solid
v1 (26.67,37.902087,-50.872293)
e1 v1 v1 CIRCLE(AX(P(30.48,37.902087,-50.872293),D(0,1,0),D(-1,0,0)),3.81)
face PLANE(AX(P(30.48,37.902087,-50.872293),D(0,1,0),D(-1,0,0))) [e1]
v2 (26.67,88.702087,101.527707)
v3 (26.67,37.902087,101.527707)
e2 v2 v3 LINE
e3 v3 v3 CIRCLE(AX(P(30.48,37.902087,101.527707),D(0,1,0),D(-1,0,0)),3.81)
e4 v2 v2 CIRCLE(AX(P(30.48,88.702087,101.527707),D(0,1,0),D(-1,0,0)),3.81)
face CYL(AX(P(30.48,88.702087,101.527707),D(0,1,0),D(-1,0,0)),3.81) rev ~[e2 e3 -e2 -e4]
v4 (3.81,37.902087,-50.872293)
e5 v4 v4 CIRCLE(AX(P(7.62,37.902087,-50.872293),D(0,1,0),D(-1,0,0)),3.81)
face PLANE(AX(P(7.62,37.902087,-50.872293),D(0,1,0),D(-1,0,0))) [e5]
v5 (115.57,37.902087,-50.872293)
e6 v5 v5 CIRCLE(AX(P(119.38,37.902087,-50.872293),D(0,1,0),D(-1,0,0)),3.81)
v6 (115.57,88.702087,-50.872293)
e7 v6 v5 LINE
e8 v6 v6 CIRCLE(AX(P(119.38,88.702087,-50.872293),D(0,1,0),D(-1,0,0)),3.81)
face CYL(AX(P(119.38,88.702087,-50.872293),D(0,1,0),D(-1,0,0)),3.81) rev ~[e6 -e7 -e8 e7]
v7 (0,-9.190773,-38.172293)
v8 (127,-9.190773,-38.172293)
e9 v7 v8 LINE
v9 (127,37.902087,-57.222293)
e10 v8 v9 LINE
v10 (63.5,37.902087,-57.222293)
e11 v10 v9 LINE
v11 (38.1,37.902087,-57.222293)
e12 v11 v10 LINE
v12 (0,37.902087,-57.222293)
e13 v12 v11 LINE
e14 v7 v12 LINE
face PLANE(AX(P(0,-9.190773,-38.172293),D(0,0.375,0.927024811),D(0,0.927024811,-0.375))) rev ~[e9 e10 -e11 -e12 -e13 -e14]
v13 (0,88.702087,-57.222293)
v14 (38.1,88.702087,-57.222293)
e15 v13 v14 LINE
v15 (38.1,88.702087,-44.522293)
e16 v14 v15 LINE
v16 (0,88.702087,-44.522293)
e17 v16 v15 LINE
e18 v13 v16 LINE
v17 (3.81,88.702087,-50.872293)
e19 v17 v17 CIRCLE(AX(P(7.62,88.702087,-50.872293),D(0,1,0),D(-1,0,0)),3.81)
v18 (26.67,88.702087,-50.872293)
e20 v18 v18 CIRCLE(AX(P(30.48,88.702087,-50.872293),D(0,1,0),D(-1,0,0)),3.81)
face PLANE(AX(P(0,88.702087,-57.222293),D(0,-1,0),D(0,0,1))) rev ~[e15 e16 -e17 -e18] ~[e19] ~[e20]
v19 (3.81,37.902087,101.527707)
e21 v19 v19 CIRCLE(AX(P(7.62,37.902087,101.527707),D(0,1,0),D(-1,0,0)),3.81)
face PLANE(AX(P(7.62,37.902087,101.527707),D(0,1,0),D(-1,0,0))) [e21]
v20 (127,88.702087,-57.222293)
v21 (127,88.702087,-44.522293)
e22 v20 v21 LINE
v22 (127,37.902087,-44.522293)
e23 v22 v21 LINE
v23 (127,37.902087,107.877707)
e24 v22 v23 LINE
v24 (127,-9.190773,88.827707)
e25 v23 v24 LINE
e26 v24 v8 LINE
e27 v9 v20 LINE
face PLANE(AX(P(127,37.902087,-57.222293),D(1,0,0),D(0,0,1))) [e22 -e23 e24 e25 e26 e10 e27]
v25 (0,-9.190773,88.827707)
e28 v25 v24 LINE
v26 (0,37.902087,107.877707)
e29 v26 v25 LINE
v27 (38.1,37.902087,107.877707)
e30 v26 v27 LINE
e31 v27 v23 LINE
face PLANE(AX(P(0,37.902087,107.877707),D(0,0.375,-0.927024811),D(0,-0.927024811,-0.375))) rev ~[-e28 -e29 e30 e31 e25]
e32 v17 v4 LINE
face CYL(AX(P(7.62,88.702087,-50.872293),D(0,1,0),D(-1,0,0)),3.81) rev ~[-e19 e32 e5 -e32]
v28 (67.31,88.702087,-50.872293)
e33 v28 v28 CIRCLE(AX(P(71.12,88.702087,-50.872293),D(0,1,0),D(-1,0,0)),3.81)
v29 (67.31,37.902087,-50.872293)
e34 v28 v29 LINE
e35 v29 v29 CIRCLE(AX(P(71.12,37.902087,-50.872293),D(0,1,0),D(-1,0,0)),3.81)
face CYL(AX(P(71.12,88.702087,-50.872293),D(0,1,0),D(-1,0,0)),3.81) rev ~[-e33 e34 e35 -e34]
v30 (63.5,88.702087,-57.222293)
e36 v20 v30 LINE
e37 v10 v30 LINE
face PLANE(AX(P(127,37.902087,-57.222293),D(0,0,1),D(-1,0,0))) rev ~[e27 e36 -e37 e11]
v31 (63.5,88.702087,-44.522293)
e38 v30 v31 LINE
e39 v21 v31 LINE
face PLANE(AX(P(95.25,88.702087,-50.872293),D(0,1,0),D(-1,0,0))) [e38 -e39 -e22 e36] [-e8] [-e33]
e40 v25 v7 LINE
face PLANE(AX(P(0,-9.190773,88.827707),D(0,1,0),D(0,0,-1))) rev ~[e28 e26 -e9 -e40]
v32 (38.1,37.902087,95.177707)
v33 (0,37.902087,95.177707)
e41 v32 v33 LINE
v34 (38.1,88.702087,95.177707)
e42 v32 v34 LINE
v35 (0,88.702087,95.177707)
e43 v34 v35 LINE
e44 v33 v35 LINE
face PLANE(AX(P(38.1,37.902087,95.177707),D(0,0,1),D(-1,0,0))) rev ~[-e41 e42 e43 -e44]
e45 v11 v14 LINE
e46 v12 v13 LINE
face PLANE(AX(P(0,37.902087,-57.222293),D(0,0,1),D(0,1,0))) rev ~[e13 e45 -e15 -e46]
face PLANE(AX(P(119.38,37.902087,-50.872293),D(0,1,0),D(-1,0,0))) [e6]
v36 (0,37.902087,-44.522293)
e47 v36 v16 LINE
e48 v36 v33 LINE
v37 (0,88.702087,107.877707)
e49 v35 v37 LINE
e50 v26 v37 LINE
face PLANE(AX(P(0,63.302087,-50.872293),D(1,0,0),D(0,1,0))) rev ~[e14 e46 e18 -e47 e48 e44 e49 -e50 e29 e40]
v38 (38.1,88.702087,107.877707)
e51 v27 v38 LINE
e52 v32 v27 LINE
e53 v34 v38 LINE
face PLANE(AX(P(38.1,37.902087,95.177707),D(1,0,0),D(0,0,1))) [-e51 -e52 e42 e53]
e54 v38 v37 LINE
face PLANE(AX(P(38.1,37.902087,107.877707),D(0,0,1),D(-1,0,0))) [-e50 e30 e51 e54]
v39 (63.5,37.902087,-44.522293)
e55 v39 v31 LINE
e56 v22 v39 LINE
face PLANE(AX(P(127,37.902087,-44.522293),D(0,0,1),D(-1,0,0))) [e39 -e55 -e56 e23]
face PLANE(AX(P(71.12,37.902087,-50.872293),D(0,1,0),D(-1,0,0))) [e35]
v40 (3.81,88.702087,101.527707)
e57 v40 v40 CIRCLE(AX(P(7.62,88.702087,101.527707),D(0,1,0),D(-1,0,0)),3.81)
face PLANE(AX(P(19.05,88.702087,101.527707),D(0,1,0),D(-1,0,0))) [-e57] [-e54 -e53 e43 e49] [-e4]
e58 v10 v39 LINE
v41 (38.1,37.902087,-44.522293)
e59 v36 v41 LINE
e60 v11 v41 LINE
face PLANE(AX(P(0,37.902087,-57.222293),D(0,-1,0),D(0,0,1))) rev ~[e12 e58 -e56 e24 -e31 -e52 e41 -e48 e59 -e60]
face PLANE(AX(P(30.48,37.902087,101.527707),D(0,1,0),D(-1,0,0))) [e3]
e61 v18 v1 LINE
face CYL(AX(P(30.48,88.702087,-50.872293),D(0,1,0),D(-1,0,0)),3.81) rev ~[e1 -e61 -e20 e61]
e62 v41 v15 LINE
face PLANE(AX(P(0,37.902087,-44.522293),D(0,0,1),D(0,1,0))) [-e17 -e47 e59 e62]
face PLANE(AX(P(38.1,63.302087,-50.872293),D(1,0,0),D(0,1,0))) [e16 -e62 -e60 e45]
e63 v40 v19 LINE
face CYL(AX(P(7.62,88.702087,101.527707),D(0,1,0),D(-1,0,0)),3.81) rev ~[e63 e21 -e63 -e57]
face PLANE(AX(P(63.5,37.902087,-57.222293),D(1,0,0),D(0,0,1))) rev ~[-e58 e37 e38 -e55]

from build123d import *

# Parameters (mm, degrees)
F1_DEPTH  = 127
F0_W      = 50.8
F0_H      = 12.7
F2_DEPTH  = 38.1
F3_W      = 63.5
F3_H      = 12.7
F3_W_2    = 38.1
F4_DEPTH  = 50.8
F5_R      = 3.81
F6_DEPTH  = 50.8
F7_R      = 3.81
F8_DEPTH  = 50.8
F9_R      = 3.81
F10_DEPTH = 50.8


# Not quite as in the source:
# - a feature names something its author has since deleted; it is built from what else it names


with BuildPart() as f1:
    # F0 (on Right) → F1 (new body)
    with BuildSketch(Plane.YZ):
        Polygon((37.9020869732, -44.5222934544), (37.9020869732, 107.8777065456), (-9.1907734199, 88.8277065456), (-9.1907734199, -38.1722934544), (37.9020869732, -57.2222934544), align=None)
    extrude(amount=F1_DEPTH)

    # F0 (on Right) → F2 (join)
    with BuildSketch(Plane.YZ):
        with Locations((63.3020869732, -50.8722934544)):
            Rectangle(F0_W, F0_H)
    extrude(amount=F2_DEPTH)

    # F3 (on face) → F4 (join)
    with BuildSketch(Plane(origin=(0, 37.9020869732, 0), x_dir=(-1, 0, 0), z_dir=(0, 1, 0))):
        with Locations((-95.25, -50.8722934544)):
            Rectangle(F3_W, F3_H)
        with Locations((-19.05, 101.5277065456)):
            Rectangle(F3_W_2, F3_H)
    extrude(amount=F4_DEPTH)

    # F5 (on face) → F6 (cut)
    with BuildSketch(Plane(origin=(0, 88.7020869732, 0), x_dir=(-1, 0, 0), z_dir=(0, 1, 0))):
        with Locations((-7.62, 101.5277065456)):
            Circle(F5_R)
        with Locations((-30.48, 101.5277065456)):
            Circle(F5_R)
    extrude(amount=-F6_DEPTH, mode=Mode.SUBTRACT)

    # F7 (on face) → F8 (cut)
    with BuildSketch(Plane(origin=(0, 88.7020869732, 0), x_dir=(-1, 0, 0), z_dir=(0, 1, 0))):
        with Locations((-30.48, -50.8722934544)):
            Circle(F7_R)
        with Locations((-7.62, -50.8722934544)):
            Circle(F7_R)
    extrude(amount=-F8_DEPTH, mode=Mode.SUBTRACT)

    # F9 (on face) → F10 (cut)
    with BuildSketch(Plane(origin=(0, 88.7020869732, 0), x_dir=(-1, 0, 0), z_dir=(0, 1, 0))):
        with Locations((-71.12, -50.8722934544)):
            Circle(F9_R)
        with Locations((-119.38, -50.8722934544)):
            Circle(F9_R)
    extrude(amount=-F10_DEPTH, mode=Mode.SUBTRACT)


solid = f1.part
